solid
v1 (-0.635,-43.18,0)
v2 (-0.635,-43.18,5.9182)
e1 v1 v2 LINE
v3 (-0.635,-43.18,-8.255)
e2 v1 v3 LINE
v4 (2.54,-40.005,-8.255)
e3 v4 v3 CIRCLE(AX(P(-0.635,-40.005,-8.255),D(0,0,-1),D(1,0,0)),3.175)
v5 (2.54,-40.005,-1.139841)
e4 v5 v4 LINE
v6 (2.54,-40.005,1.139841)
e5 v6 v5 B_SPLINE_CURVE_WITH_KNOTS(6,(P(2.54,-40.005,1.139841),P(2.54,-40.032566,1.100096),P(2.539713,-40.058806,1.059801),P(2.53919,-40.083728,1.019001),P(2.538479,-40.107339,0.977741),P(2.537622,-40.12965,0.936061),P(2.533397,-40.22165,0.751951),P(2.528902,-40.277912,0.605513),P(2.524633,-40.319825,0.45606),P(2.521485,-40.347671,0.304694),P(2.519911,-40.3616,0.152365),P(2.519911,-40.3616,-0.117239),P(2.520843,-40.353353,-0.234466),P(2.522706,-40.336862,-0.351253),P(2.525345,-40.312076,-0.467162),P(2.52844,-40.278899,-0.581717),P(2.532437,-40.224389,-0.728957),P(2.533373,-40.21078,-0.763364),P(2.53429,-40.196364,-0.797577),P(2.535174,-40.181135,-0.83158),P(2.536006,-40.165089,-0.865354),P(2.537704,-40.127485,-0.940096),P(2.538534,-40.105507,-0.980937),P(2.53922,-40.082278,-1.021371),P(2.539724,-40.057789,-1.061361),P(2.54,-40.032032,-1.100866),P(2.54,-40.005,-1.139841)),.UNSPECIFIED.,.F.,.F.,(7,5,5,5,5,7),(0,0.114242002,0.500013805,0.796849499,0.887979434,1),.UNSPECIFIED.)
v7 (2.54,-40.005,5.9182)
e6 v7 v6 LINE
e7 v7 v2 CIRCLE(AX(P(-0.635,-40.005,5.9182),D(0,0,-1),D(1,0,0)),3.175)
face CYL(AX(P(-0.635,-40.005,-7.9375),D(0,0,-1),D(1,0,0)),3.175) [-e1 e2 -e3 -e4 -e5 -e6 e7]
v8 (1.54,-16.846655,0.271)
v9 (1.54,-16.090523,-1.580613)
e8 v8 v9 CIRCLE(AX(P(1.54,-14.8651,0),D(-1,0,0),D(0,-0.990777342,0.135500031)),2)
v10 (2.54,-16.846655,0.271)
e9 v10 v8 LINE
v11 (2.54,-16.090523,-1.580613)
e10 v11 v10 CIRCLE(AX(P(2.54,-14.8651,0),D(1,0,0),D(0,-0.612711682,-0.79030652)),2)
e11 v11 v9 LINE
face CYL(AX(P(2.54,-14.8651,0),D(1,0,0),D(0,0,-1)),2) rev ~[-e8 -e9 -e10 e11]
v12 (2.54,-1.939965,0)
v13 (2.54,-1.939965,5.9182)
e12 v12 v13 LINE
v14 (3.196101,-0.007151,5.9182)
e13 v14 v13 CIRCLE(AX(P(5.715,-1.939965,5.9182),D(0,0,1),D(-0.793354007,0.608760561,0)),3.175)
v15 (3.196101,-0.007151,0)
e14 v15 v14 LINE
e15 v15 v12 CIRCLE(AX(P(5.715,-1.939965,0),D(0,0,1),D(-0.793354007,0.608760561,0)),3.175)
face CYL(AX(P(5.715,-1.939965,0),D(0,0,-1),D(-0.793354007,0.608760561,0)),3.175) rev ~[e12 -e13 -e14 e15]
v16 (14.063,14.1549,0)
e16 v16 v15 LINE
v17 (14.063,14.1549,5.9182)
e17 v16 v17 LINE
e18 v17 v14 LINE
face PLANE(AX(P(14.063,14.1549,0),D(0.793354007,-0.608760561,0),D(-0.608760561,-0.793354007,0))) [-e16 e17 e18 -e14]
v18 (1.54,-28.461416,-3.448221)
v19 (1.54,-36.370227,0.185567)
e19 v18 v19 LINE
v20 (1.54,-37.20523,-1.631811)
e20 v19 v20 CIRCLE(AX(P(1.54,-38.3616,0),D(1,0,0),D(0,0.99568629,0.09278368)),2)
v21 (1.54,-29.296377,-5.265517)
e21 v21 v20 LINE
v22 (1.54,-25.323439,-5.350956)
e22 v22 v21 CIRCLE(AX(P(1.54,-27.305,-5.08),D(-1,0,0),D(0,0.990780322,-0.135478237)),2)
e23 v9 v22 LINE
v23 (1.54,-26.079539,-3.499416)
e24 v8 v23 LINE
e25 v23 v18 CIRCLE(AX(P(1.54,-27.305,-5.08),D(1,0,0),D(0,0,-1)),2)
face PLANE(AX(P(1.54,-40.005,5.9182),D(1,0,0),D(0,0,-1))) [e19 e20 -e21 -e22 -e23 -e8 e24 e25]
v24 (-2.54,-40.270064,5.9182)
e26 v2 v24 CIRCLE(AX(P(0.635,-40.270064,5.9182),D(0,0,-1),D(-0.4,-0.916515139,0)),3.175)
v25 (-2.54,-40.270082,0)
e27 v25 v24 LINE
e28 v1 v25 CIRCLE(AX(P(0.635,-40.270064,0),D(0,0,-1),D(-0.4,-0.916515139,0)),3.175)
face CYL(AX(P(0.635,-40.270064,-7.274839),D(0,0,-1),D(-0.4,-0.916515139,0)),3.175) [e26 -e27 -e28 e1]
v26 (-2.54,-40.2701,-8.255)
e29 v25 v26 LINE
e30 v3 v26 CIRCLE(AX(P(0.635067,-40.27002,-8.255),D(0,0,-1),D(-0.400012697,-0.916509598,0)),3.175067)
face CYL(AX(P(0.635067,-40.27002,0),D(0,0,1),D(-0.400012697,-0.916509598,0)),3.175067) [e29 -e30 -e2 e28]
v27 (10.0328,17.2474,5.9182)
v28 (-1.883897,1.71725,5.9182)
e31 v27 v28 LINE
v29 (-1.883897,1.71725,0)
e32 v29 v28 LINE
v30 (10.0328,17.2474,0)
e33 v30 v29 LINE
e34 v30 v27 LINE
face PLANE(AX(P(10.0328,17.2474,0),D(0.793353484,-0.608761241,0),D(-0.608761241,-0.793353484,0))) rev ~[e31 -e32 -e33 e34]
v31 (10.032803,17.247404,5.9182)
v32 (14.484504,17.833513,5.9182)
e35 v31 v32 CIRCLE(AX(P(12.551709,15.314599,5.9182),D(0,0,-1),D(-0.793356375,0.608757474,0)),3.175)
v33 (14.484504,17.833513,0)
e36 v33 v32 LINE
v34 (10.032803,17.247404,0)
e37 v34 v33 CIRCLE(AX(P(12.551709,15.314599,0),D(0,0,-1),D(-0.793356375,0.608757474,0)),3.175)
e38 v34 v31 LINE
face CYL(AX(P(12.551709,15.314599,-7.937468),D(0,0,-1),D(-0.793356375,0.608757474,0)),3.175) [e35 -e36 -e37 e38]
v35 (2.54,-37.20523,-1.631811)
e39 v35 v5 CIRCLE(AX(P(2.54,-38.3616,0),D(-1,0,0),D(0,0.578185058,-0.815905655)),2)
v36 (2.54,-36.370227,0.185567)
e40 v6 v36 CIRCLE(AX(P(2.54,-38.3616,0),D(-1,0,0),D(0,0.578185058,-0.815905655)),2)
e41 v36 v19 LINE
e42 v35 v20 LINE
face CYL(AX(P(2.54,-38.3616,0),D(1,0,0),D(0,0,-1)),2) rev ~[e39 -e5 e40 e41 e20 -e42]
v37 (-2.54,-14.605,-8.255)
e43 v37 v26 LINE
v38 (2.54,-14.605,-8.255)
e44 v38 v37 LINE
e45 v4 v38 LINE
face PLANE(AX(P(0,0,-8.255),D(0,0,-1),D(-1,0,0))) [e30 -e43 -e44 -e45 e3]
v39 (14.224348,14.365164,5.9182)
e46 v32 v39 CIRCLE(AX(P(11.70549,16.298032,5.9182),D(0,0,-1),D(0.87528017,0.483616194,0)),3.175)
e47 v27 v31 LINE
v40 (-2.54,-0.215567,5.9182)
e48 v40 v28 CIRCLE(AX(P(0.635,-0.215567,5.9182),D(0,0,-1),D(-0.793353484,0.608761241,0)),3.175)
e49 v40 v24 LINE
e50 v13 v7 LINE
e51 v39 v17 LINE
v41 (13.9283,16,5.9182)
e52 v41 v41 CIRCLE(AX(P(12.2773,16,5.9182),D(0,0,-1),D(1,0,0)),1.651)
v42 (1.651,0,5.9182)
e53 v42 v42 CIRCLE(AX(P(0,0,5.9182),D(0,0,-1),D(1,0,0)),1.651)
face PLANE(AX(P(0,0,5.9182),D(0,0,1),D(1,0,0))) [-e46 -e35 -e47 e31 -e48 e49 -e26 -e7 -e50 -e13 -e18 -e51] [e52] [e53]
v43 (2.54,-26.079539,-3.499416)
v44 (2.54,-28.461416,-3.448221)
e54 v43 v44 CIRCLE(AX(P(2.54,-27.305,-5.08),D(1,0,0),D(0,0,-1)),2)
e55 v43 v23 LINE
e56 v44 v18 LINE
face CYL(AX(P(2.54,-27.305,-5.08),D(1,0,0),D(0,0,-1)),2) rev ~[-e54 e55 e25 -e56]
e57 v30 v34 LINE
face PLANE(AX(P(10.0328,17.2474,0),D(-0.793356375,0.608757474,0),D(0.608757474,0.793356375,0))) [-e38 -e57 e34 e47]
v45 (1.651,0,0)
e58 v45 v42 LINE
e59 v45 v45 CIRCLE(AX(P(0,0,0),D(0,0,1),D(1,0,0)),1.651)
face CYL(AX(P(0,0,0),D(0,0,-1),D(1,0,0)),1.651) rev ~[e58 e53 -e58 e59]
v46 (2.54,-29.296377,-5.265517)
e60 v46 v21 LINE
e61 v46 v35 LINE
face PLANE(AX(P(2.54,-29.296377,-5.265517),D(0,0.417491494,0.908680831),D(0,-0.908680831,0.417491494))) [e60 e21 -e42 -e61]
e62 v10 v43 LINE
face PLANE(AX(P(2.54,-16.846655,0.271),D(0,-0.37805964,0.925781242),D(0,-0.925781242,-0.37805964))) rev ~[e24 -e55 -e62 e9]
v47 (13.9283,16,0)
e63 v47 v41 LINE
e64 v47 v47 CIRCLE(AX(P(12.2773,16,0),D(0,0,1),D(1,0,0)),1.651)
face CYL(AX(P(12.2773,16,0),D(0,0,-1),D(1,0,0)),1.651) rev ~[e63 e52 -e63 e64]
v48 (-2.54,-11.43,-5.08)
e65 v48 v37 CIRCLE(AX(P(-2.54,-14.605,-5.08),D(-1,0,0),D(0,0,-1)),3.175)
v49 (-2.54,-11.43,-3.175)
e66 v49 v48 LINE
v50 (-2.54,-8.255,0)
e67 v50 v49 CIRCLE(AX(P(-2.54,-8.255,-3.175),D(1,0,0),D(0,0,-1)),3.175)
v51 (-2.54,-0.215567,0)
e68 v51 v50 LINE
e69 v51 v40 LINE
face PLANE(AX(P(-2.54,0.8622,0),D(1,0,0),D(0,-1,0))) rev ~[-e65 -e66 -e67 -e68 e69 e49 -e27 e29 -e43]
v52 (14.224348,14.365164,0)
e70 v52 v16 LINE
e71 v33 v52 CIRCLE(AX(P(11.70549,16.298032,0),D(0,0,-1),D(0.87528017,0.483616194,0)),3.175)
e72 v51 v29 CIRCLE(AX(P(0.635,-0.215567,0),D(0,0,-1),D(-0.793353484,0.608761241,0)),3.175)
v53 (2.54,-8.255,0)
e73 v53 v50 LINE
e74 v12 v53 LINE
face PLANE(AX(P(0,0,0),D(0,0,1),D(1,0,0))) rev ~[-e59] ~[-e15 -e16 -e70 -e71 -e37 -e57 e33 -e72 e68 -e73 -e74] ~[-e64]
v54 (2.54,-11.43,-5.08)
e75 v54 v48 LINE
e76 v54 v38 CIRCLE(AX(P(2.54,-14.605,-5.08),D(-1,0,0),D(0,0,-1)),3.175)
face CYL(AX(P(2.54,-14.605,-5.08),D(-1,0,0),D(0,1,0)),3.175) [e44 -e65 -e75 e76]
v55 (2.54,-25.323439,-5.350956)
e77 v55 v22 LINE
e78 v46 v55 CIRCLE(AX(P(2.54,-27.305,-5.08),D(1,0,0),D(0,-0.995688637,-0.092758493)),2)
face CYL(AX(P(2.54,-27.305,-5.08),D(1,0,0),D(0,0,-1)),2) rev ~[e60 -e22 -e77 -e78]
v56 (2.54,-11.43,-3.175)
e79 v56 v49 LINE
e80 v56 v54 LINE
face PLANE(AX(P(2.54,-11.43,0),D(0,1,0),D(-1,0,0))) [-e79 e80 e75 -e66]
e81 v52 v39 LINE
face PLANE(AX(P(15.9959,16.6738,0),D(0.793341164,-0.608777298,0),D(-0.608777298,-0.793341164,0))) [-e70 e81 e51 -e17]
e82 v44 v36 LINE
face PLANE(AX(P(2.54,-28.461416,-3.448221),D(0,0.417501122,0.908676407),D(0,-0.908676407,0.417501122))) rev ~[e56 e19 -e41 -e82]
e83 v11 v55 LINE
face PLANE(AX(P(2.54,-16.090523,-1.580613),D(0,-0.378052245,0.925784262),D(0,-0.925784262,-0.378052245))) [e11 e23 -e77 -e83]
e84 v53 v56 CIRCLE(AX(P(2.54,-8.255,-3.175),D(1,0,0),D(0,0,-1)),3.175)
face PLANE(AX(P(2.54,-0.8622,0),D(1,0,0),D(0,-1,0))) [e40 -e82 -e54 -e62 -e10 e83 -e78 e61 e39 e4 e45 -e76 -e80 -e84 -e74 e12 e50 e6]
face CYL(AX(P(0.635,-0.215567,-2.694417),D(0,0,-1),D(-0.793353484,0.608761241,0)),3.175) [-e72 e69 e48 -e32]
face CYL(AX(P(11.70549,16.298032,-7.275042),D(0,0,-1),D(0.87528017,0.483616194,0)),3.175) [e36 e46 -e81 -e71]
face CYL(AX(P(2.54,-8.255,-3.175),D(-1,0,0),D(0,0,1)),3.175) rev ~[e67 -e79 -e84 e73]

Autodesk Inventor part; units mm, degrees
ref_plane "YZ Plane" through (0, 0, 0) normal (1, 0, 0) x (0, 1, 0)
ref_plane "XZ Plane" through (0, 0, 0) normal (0, 1, 0) x (-1, 0, 0)
ref_plane "XY Plane" through (0, 0, 0) normal (0, 0, 1) x (1, 0, 0)
sketch "Sketch1" plane through (0, 0, 0) normal (0, 0, 1) x (1, 0, 0)
  line L0 (0, 0) -> (0, -43.18)
  line L1 (0, 0) -> (12.2773, 16)
  line L2 (0, 0) -> (20.1676, 0) construction
  circle A0 centre (12.2773, 16) radius 1.651
  circle A1 centre (0, 0) radius 1.651
  line L3 (10.0328, 17.2474) -> (-2.54, 0.8622)
  line L4 (-2.54, 0.8622) -> (-2.54, -43.18)
  line L5 (14.063, 14.1549) -> (2.54, -0.8622)
  line L6 (2.54, -0.8622) -> (2.54, -43.18)
  line L7 (10.0328, 17.2474) -> (11.9656, 19.7663)
  line L8 (11.9656, 19.7663) -> (15.9959, 16.6738)
  line L9 (15.9959, 16.6738) -> (14.063, 14.1549)
  line L10 (-2.54, -43.18) -> (2.54, -43.18)
  dimension "d0" = 43.18
  dimension "d1" = 20.1676
  dimension "d2" = 52.5
  dimension "d3" = 3.302
  dimension "d4" = 3.302
  dimension "d5" = 2.54
  dimension "d6" = 2.54
  dimension "d7" = 3.175
extrude "Extrusion1" add sketch "Sketch1" along normal blind 5.9182
fillet "Fillet1" radius 3.175 6 edges at (11.9656, 19.7663, 2.9591) (15.9959, 16.6738, 2.9591) (-2.54, 0.8622, 2.9591) (2.54, -0.8622, 2.9591) (2.54, -43.18, 2.9591) (-2.54, -43.18, 2.9591)
sketch "Sketch2" plane through (0, 0, 0) normal (0, 0, -1) x (-1, 0, 0)
  line L0 (-2.54, -40.005) -> (-2.54, -1.94) projected
  line L1 (-2.54, -11.43) -> (2.54, -11.43)
  line L2 (2.54, -0.2156) -> (2.54, -40.2701) projected
  arc A0 (-2.54, -40.005) -> (0.635, -43.18) centre (0.635, -40.005) ccw projected
  circle A1 centre (0, 0) radius 1.651 projected
  circle A2 centre (-12.2773, 16) radius 1.651 projected
  arc A3 (0.635, -43.18) -> (2.54, -40.2701) centre (-0.635, -40.2701) ccw projected
  line L3 (2.54, -0.2156) -> (2.54, -40.2701) projected
  arc A4 (2.54, -0.2156) -> (1.8839, 1.7173) centre (-0.635, -0.2156) ccw projected
  line L4 (-10.0328, 17.2474) -> (1.8839, 1.7173) projected
  arc A5 (-10.0328, 17.2474) -> (-14.4845, 17.8335) centre (-12.5517, 15.3146) ccw projected
  arc A6 (-14.4845, 17.8335) -> (-14.2244, 14.3652) centre (-11.7055, 16.298) ccw projected
  line L5 (-3.1961, -0.0072) -> (-14.2244, 14.3652) projected
  arc A7 (-2.54, -1.94) -> (-3.1961, -0.0072) centre (-5.715, -1.94) ccw projected
  line L6 (-2.54, -40.005) -> (-2.54, -1.94) projected
  arc A8 (-2.54, -40.005) -> (0.635, -43.18) centre (0.635, -40.005) ccw projected
  point P0 (0.635, -43.18)
  dimension "d11" = 31.75
extrude "Extrusion2" add sketch "Sketch2" along normal blind 8.255 contours L0 L1 L2 A3 A0
fillet "Fillet2" radius 3.175 2 edges at (0, -11.43, 0) (0, -11.43, -8.255)
sketch "Sketch3" plane through (2.54, -40.005, 5.9182) normal (1, 0, 0) x (0, 0, -1)
  circle A0 centre (5.9182, 1.6434) radius 2
  circle A1 centre (5.9182, 25.1399) radius 2
  arc A2 (14.1732, 25.4) -> (10.9982, 28.575) centre (10.9982, 25.4) ccw projected
  line L0 (9.0932, 28.575) -> (10.9982, 28.575) projected
  arc A3 (5.9182, 31.75) -> (9.0932, 28.575) centre (9.0932, 31.75) ccw projected
  line L1 (5.9182, 31.75) -> (5.9182, 38.065) projected
  line L2 (0, 38.065) -> (5.9182, 38.065) projected
  line L3 (0, 0) -> (0, 38.065) projected
  line L4 (0, 0) -> (14.1732, 0) projected
  line L5 (14.1732, 25.4) -> (14.1732, 0) projected
  circle A4 centre (10.9982, 12.7) radius 2
  line L6 (5.9182, 1.6434) -> (10.9982, 12.7)
  line L7 (10.9982, 12.7) -> (5.9182, 25.1399)
  line L8 (4.9924, 24.7618) -> (9.9085, 12.7234)
  line L9 (9.9085, 12.7234) -> (5.0095, 2.0609)
  line L10 (6.844, 25.518) -> (12.0879, 12.6766)
  line L11 (12.0879, 12.6766) -> (6.8269, 1.2259)
  point P0 (5.9182, 40.005)
  point P1 (5.6472, 23.1583)
  point P2 (9.4176, 13.9254)
  point P3 (9.3664, 11.5436)
  point P4 (5.7326, 3.6348)
  point P5 (7.55, 2.7998)
  point P6 (11.1838, 10.7086)
  point P7 (11.2692, 14.6816)
  point P8 (7.4988, 23.9144)
  dimension "d15" = 4
  dimension "d16" = 4
  dimension "d17" = 4
  dimension "d18" = 1
  dimension "d19" = 1
extrude "Extrusion3" cut sketch "Sketch3" against normal blind 1 contours A0 L4 | A0 L6 A4 L11 | A0 L4 | A0 L9 A4 L6 | L11 L10 A4 | A4 L6 L7 L10 L11 | A4 L9 L8 L7 L6 | A4 L8 L9 | A4 L7 A1 L10 | L8 A1 L7 A4 | A1
properties part number "Hank - claw"
